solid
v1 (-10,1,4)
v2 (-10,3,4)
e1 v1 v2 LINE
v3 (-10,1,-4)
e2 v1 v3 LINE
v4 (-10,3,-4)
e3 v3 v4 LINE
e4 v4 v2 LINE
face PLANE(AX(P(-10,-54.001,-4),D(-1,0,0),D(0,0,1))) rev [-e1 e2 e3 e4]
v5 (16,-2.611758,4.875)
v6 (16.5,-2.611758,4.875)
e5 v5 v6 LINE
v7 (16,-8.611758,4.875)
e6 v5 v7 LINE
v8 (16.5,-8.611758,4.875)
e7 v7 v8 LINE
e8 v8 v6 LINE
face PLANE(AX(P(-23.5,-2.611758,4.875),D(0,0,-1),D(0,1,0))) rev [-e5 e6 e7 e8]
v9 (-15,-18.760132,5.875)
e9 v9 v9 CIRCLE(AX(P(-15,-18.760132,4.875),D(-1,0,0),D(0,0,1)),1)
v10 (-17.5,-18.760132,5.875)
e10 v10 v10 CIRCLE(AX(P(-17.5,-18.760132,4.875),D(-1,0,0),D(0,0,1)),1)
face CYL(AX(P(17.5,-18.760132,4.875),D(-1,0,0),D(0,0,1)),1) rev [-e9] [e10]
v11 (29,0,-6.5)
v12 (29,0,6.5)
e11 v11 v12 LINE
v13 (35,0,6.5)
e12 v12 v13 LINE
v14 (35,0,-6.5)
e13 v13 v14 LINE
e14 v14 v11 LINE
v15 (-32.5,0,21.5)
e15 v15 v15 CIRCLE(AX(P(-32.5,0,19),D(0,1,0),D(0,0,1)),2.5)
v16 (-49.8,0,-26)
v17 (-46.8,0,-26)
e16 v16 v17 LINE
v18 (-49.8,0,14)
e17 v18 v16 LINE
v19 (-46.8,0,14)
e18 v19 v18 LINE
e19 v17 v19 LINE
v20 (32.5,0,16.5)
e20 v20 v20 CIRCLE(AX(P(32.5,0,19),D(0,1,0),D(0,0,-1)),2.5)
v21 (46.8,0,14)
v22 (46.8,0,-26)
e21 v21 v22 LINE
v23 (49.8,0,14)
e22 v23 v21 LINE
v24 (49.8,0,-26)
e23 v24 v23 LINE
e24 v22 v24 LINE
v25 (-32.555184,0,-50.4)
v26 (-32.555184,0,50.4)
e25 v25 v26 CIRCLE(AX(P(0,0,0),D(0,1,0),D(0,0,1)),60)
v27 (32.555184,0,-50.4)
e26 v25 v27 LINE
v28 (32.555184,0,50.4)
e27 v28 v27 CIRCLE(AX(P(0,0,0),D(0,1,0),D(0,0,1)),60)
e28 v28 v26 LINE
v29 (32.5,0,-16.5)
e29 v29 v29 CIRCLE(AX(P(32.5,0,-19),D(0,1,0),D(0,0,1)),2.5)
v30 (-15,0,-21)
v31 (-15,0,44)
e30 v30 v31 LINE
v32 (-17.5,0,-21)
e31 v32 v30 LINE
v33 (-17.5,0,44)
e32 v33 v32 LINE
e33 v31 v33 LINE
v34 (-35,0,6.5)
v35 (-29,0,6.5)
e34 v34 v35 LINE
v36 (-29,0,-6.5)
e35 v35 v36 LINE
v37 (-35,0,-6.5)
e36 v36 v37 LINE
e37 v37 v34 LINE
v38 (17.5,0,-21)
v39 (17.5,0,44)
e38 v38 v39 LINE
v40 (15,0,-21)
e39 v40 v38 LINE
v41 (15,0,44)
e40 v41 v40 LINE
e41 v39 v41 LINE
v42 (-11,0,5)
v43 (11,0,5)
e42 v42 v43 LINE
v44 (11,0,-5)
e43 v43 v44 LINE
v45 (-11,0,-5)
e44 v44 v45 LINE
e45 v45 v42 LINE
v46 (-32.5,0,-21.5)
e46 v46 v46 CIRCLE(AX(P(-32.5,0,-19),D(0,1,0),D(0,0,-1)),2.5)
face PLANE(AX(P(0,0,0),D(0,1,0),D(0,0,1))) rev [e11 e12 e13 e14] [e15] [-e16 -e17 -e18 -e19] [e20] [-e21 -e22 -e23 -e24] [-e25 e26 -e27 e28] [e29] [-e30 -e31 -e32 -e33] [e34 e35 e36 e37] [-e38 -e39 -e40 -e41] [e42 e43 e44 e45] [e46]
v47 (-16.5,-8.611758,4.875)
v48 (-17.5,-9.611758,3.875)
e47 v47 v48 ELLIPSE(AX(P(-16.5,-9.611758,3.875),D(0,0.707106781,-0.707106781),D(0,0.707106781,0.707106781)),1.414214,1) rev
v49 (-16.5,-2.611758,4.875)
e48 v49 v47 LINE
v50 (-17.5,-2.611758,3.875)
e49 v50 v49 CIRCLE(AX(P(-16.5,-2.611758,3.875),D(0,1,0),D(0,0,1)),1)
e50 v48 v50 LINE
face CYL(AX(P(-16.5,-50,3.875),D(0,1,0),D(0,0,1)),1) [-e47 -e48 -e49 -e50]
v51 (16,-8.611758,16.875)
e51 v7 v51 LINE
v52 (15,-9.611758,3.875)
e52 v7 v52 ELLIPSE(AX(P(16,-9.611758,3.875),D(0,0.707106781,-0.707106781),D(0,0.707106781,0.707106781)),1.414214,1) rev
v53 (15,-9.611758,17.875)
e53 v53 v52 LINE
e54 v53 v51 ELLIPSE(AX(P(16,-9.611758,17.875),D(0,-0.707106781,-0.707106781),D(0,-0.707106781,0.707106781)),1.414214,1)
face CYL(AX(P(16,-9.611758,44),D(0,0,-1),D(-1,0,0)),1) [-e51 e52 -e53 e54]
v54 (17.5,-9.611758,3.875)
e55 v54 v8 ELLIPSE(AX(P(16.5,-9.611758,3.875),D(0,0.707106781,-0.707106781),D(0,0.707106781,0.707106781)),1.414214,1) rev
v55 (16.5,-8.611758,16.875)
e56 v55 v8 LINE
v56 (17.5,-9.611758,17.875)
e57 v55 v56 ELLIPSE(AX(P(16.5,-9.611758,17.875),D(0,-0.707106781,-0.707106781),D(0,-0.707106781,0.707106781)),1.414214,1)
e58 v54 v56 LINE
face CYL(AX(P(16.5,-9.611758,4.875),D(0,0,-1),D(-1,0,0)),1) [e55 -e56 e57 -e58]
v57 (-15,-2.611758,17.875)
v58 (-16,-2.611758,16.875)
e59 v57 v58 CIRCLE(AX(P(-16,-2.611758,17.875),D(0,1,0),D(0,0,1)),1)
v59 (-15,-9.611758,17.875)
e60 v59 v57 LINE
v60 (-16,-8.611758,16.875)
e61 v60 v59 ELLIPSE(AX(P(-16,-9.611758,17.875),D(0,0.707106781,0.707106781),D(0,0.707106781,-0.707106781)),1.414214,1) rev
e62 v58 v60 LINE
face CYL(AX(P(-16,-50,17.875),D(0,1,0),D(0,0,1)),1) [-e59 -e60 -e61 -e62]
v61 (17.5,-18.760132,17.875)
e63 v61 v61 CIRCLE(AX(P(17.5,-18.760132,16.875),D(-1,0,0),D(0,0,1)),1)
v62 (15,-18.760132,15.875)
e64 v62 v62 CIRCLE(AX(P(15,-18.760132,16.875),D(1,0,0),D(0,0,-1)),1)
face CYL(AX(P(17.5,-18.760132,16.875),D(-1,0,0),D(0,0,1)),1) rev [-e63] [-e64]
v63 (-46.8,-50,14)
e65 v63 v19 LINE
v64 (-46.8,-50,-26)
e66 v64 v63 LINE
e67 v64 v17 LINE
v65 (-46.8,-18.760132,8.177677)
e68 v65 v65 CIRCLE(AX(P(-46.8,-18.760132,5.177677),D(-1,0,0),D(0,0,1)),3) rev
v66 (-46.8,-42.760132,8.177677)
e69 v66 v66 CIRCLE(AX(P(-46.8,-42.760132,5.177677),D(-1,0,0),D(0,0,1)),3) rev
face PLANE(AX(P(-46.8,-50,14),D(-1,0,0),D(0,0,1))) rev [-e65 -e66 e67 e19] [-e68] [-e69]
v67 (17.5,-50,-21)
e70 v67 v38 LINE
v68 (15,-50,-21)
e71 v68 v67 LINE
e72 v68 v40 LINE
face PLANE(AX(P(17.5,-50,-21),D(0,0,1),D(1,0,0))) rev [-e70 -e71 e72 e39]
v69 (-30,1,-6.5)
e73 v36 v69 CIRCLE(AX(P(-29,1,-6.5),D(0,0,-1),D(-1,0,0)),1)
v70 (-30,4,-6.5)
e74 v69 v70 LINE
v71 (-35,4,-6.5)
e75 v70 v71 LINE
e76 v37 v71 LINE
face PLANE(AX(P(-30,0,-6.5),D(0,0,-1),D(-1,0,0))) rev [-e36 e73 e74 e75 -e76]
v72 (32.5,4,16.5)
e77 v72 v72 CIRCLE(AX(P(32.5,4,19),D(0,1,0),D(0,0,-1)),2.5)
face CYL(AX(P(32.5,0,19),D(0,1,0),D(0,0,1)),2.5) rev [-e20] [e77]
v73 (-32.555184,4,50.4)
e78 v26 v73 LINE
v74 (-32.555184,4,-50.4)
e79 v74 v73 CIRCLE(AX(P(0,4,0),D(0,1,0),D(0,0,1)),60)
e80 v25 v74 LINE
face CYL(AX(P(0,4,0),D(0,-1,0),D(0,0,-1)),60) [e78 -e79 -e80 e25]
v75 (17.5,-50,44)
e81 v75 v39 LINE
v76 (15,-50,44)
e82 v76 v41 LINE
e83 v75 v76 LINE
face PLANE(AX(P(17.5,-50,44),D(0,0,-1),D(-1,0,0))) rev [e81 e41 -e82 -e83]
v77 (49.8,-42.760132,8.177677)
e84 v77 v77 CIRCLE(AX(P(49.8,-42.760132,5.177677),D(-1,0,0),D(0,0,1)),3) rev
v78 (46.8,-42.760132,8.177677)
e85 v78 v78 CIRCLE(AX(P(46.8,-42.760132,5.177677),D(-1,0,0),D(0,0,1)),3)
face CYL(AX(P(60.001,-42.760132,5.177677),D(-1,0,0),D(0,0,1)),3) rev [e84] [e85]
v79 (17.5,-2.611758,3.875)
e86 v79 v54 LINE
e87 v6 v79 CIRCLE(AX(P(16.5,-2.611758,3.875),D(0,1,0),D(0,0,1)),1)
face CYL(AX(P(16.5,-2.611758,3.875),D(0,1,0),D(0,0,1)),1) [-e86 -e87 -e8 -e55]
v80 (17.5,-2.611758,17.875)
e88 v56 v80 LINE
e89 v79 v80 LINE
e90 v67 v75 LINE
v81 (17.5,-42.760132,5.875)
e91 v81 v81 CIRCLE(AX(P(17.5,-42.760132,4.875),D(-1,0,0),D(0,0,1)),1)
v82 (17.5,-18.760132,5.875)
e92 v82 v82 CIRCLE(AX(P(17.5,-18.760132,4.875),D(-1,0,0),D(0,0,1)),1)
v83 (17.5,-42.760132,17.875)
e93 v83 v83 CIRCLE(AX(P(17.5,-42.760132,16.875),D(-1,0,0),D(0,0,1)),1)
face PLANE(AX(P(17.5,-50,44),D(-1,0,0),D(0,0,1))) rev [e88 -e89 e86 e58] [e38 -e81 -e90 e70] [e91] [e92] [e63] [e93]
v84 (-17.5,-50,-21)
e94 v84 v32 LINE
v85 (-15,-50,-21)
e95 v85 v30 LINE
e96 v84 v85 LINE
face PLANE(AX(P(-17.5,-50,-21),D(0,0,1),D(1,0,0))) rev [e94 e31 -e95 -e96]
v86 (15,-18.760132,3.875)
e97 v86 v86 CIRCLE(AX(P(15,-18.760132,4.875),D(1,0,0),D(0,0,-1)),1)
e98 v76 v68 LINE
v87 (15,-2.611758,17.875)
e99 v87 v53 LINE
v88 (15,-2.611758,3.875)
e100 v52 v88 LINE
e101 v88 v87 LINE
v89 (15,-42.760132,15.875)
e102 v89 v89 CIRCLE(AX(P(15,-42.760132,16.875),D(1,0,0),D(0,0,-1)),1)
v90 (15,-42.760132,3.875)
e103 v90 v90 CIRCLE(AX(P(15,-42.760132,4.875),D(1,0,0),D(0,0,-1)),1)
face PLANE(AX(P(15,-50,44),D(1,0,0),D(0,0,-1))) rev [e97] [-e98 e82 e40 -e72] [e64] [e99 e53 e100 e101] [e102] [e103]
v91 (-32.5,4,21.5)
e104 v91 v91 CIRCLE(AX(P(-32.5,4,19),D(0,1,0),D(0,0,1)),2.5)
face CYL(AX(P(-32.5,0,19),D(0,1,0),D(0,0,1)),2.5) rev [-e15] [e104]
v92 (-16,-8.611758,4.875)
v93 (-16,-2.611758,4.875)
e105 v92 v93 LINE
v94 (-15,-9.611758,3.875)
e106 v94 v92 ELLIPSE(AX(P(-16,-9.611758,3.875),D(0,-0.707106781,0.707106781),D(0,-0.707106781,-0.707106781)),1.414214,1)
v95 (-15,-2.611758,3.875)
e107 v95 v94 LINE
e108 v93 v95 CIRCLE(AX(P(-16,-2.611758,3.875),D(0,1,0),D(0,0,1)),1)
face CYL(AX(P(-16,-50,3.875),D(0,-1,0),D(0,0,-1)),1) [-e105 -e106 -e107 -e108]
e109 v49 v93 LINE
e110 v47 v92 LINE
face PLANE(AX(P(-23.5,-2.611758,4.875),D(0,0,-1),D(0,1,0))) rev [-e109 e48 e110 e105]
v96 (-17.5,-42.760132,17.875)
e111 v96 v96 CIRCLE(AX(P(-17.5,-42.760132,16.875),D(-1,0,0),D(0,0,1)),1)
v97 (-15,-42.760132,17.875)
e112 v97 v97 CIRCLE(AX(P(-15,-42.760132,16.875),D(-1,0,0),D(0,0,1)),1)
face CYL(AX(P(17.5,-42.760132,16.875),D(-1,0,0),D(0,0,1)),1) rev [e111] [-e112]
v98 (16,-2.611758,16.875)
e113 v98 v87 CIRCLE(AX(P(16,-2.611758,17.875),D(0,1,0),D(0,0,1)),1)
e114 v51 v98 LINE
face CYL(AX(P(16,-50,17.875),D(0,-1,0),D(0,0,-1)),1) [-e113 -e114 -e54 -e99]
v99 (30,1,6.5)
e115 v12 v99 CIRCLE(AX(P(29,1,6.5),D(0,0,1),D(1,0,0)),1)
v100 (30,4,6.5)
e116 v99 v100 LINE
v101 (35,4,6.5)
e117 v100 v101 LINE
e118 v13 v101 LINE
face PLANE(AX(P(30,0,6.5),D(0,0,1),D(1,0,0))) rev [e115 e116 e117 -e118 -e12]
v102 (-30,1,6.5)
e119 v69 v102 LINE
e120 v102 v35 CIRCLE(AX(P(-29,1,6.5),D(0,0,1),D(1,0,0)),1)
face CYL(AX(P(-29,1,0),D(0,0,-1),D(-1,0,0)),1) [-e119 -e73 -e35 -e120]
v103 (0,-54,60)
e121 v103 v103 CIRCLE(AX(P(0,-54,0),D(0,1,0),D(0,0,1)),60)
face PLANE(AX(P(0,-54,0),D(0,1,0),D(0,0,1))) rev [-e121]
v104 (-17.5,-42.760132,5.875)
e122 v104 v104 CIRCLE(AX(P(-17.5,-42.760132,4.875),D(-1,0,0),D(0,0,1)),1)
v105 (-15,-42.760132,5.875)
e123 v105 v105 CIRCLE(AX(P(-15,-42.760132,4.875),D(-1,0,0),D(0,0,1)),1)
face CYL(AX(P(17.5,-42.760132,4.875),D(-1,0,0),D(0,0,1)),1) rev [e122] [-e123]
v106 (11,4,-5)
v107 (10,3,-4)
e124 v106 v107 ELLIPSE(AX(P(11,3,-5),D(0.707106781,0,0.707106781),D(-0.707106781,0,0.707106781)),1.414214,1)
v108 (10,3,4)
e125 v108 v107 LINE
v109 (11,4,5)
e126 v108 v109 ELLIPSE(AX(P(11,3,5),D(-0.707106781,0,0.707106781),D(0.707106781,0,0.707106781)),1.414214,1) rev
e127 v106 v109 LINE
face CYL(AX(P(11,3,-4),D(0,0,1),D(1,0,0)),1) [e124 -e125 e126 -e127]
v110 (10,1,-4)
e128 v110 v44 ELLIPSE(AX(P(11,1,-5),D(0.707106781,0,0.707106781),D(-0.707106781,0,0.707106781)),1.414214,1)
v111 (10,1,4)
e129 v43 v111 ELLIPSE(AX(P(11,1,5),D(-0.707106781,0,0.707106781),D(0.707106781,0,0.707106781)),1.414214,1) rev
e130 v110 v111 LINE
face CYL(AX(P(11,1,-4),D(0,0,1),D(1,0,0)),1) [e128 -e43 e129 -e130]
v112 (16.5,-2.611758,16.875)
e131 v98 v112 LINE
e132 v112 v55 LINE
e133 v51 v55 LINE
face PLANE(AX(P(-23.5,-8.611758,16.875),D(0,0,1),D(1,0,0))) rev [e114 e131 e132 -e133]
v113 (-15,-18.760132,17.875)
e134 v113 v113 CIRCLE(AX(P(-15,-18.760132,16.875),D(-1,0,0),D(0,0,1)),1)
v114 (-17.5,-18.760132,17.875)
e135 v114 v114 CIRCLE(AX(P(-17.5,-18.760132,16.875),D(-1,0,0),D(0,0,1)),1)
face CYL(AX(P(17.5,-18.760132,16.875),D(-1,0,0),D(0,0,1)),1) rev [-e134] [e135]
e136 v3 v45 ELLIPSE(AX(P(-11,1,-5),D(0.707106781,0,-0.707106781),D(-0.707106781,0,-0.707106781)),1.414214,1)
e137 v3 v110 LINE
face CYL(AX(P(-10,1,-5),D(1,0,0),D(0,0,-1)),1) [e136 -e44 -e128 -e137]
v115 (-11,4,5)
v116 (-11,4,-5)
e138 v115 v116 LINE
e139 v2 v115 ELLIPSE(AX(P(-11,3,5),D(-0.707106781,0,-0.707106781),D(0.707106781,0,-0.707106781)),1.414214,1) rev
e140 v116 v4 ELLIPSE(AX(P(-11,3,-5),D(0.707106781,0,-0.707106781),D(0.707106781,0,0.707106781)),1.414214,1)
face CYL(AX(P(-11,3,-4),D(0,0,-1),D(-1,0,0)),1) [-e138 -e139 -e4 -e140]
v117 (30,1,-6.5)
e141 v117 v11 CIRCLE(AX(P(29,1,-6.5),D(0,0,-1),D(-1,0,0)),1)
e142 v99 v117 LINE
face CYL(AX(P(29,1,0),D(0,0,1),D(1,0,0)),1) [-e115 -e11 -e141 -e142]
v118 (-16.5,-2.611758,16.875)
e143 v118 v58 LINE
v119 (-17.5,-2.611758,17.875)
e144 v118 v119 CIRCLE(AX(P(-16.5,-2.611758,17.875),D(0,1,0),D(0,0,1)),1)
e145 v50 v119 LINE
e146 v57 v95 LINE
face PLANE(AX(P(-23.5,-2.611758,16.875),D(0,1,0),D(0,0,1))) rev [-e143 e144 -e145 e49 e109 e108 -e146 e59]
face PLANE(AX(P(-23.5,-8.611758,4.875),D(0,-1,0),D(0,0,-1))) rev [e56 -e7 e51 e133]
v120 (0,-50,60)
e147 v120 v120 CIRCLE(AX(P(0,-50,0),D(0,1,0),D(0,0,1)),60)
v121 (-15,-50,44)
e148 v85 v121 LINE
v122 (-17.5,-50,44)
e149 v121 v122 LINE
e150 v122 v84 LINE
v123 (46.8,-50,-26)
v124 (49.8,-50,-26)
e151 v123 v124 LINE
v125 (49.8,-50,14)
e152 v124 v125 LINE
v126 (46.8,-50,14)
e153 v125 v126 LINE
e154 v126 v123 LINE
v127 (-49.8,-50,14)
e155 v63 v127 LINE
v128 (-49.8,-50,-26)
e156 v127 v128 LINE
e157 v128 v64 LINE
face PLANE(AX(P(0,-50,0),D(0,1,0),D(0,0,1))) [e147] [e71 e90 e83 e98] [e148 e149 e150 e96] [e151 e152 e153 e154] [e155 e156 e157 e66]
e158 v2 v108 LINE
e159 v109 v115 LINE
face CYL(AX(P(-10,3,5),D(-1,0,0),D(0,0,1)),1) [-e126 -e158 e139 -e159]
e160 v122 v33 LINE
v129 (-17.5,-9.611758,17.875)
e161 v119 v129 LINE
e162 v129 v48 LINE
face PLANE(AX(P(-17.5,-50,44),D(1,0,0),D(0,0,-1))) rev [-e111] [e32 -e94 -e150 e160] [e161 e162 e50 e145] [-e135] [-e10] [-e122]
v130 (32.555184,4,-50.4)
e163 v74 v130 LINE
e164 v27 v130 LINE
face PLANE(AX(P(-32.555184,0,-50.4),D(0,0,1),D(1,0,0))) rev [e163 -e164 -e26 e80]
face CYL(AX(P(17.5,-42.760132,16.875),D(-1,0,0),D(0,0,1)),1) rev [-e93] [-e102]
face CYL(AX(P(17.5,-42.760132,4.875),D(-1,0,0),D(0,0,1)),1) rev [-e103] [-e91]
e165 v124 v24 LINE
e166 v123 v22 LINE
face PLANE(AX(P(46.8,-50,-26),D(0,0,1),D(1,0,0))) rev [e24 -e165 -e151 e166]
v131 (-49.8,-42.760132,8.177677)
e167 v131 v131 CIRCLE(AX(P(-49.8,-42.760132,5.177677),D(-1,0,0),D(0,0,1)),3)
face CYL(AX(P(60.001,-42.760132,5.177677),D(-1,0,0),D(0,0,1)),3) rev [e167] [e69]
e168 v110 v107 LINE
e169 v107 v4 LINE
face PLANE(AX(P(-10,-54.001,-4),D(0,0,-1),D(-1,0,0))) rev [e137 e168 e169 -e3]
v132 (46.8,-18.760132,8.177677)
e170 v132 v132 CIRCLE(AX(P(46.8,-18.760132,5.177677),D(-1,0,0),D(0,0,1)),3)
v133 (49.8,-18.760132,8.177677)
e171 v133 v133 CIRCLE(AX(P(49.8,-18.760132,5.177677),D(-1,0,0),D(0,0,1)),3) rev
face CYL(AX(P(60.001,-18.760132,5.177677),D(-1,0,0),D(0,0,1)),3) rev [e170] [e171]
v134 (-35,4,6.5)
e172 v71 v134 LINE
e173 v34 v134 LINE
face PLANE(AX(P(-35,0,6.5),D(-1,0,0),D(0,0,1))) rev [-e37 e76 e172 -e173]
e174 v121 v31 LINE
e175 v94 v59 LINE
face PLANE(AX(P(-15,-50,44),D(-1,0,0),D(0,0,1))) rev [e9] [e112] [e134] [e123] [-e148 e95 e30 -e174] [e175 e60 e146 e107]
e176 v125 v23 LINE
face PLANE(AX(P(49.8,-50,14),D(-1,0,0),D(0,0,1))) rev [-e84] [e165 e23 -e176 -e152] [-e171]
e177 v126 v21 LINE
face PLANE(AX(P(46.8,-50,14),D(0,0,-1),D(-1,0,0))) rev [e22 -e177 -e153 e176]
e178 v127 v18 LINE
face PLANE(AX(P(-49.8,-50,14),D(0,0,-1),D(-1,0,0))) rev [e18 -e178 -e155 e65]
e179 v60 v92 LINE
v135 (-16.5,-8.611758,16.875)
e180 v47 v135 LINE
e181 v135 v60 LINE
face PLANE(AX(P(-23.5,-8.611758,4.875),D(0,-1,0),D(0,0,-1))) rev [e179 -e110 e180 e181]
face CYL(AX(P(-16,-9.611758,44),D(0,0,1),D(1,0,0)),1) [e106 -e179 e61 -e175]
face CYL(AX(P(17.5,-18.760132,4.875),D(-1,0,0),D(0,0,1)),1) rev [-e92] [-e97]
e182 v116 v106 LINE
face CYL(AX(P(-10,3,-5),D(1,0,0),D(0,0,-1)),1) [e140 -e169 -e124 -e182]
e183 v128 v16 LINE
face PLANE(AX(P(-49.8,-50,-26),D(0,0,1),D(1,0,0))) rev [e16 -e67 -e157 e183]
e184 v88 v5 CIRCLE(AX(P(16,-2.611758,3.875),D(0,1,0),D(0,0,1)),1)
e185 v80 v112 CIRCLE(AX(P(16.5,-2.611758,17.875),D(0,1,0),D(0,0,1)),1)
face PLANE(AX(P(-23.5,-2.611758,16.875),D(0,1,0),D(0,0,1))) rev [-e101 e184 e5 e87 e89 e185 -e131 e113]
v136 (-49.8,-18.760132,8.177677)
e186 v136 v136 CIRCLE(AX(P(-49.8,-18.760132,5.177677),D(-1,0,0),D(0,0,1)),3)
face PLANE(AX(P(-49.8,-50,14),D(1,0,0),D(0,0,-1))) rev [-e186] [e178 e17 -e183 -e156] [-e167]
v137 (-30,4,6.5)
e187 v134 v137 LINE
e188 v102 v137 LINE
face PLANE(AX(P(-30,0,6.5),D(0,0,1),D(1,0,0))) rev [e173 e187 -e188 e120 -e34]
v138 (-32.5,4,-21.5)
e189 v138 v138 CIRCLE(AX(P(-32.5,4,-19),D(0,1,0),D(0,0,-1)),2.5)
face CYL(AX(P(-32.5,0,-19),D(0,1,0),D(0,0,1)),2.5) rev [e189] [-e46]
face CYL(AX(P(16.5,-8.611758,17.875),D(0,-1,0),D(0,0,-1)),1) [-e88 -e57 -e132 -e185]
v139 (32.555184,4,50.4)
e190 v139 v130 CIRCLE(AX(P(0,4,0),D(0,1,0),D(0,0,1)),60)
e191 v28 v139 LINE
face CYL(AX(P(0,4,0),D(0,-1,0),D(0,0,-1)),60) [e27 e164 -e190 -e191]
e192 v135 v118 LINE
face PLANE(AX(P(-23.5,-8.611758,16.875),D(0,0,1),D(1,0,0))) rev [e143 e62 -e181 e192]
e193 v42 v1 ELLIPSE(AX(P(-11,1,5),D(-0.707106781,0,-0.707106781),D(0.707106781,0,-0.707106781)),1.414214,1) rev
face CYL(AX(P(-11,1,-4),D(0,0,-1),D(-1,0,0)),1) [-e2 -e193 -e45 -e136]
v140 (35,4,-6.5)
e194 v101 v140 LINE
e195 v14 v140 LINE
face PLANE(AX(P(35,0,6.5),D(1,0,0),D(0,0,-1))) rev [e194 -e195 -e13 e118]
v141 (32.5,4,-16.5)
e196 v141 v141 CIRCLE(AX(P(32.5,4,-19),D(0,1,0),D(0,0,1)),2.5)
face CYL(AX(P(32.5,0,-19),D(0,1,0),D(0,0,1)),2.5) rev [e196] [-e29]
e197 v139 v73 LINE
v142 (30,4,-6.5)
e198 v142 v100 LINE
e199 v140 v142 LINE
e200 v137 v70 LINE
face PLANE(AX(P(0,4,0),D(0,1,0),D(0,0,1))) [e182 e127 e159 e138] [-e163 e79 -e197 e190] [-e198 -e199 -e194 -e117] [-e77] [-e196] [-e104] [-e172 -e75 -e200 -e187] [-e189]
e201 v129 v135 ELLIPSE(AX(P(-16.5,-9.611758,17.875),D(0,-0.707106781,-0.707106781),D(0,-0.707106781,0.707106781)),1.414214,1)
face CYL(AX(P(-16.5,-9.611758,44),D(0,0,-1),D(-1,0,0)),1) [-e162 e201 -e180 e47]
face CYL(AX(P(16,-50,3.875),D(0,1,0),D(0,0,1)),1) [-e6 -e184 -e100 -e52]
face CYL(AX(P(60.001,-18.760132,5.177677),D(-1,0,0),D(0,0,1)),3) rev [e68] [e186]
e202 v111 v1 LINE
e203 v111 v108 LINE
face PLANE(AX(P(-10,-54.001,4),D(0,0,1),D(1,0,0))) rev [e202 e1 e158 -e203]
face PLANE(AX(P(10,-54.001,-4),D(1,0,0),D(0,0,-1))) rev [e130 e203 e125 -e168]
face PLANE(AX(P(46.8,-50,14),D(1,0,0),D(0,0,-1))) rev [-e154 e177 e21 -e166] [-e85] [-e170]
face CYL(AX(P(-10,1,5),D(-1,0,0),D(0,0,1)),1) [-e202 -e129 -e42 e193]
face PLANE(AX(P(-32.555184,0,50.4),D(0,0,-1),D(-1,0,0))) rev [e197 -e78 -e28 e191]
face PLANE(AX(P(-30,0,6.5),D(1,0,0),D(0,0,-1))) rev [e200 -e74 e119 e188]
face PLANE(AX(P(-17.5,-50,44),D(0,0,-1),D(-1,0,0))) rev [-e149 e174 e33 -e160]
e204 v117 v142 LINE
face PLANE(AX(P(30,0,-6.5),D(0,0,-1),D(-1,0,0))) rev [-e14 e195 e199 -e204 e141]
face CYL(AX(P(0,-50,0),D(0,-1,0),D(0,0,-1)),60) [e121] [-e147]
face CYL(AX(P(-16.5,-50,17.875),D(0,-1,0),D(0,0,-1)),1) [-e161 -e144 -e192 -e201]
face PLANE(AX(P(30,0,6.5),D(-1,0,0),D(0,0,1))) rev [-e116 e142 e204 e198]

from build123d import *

# Parameters (mm, degrees)
SKETCH1_R                         = 60
BASE_BASE_DEPTH                   = 4
SIDE_START                        = -4
SIDE_CUTS_DEPTH                   = 4
SKETCH3_W                         = 5
SKETCH3_H                         = 13
TENDON_PASS_THROUGH_OPENING_DEPTH = 4
SKETCH4_R                         = 2.5
BASE_MOUNTING_HOLES_DEPTH         = 79.461200603
SKETCH5_W                         = 3
SKETCH5_H                         = 40
SKETCH5_W_2                       = 2.5
SKETCH5_H_2                       = 65
BOSS_EXTRUDE1_DEPTH               = 50
LPATTERN1_COUNT                   = 2
LPATTERN1_PITCH                   = 54
CUT_EXTRUDE1_REACH                = 138.279
SKETCH7_R                         = 3
CUT_EXTRUDE2_START                = -35
SKETCH9_R                         = 1
CUT_EXTRUDE2_DEPTH                = 35
LPATTERN2_COUNT                   = 2
LPATTERN2_PITCH                   = 96.6
FILLET1_R                         = 1
FILLET2_R                         = 1
SKETCH11_W                        = 12
SKETCH11_H                        = 6
CUT_EXTRUDE3_DEPTH                = 41
FILLET3_R                         = 1
FILLET4_R                         = 1
CUT_EXTRUDE4_REACH                = 104.781
SKETCH12_W                        = 20
SKETCH12_H                        = 8
FILLET5_R                         = 1


with BuildPart() as part:
    # Sketch1 → Base Base (new body)
    with BuildSketch(Plane(origin=(0, 0, 0), x_dir=(1, 0, 0), z_dir=(0, 1, 0))):
        with Locations(Location((0, 0, 0), (0, 0, 270))):
            Circle(SKETCH1_R)
    base_base = extrude(amount=BASE_BASE_DEPTH)

    # Sketch2 → Side Cuts (cut)
    with BuildSketch(Plane(origin=(0, 4, 0), x_dir=(1, 0, 0), z_dir=(0, 1, 0)).offset(SIDE_START)):
        with BuildLine():
            Line((-32.555183919, 50.4), (32.555183919, 50.4))
            ThreePointArc((32.555183919, 50.4), (0, 60), (-32.555183919, 50.4))
        make_face()
        with BuildLine():
            Line((-32.555183919, -50.4), (32.555183919, -50.4))
            ThreePointArc((32.555183919, -50.4), (0, -60), (-32.555183919, -50.4))
        make_face()
    extrude(amount=SIDE_CUTS_DEPTH, mode=Mode.SUBTRACT)

    # Sketch3 → Tendon Pass Through Opening (cut)
    with BuildSketch(Plane(origin=(0, 4, 0), x_dir=(1, 0, 0), z_dir=(0, 1, 0))):
        with Locations((32.5, 0)):
            Rectangle(SKETCH3_W, SKETCH3_H)
        with Locations((-32.5, 0)):
            Rectangle(SKETCH3_W, SKETCH3_H)
    extrude(amount=-TENDON_PASS_THROUGH_OPENING_DEPTH, mode=Mode.SUBTRACT)

    # Sketch4 → Base Mounting Holes (cut, through all)
    with BuildSketch(Plane(origin=(0, 4, 0), x_dir=(1, 0, 0), z_dir=(0, 1, 0))):
        with Locations(Location((32.5, 19, 0), (0, 0, 270))):
            Circle(SKETCH4_R)
        with Locations(Location((32.5, -19, 0), (0, 0, 90))):
            Circle(SKETCH4_R)
        with Locations(Location((-32.5, -19, 0), (0, 0, 270))):
            Circle(SKETCH4_R)
        with Locations(Location((-32.5, 19, 0), (0, 0, 90))):
            Circle(SKETCH4_R)
    extrude(amount=-BASE_MOUNTING_HOLES_DEPTH, mode=Mode.SUBTRACT)

    # Sketch5 → Boss-Extrude1 (add)
    with BuildSketch(Plane.XZ):
        with Locations((-48.3, -6)):
            Rectangle(SKETCH5_W, SKETCH5_H)
        with Locations((16.25, 11.5)):
            Rectangle(SKETCH5_W_2, SKETCH5_H_2)
        with Locations((48.3, -6)):
            Rectangle(SKETCH5_W, SKETCH5_H)
        with Locations((-16.25, 11.5)):
            Rectangle(SKETCH5_W_2, SKETCH5_H_2)
    extrude(amount=BOSS_EXTRUDE1_DEPTH)

    # LPattern1: Base Base ×2
    with Locations(*[(0, -i * LPATTERN1_PITCH, 0) for i in range(1, LPATTERN1_COUNT)]):
        add(base_base)

    # Sketch7 → Cut-Extrude1 (cut, up to next)
    with BuildSketch(Plane.ZY.offset(49.8), mode=Mode.PRIVATE) as cut_extrude1_sk1:
        with Locations((5.177676652, -18.760132428)):
            Circle(SKETCH7_R)
    cut_extrude1_tool1 = extrude(cut_extrude1_sk1.sketch, amount=-CUT_EXTRUDE1_REACH, mode=Mode.PRIVATE) & part.part
    # Sketch7 → Cut-Extrude1 (cut, up to next)
    with BuildSketch(Plane.ZY.offset(49.8), mode=Mode.PRIVATE) as cut_extrude1_sk2:
        with Locations((5.177676652, -42.760132428)):
            Circle(SKETCH7_R)
    cut_extrude1_tool2 = extrude(cut_extrude1_sk2.sketch, amount=-CUT_EXTRUDE1_REACH, mode=Mode.PRIVATE) & part.part
    cut_extrude1_1 = cut_extrude1_tool1.solids().sort_by_distance((-49.8, -18.760132, 5.177677))[0]
    add(cut_extrude1_1, mode=Mode.SUBTRACT)
    cut_extrude1_2 = cut_extrude1_tool2.solids().sort_by_distance((-49.8, -42.760132, 5.177677))[0]
    add(cut_extrude1_2, mode=Mode.SUBTRACT)
    cut_extrude1 = cut_extrude1_1 + cut_extrude1_2  # Cut-Extrude1 as one shape, for the pattern or mirror that repeats it

    # Sketch9 → Cut-Extrude2 (cut)
    with BuildSketch(Plane.ZY.offset(17.5).offset(CUT_EXTRUDE2_START)):
        with Locations((4.875, -18.760132428)):
            Circle(SKETCH9_R)
        with Locations((4.875, -42.760132428)):
            Circle(SKETCH9_R)
        with Locations((16.875, -18.760132428)):
            Circle(SKETCH9_R)
        with Locations((16.875, -42.760132428)):
            Circle(SKETCH9_R)
    extrude(amount=CUT_EXTRUDE2_DEPTH, mode=Mode.SUBTRACT)

    # LPattern2: Cut-Extrude1 ×2
    with Locations(*[(i * LPATTERN2_PITCH, 0, 0) for i in range(1, LPATTERN2_COUNT)]):
        add(cut_extrude1, mode=Mode.SUBTRACT)

    # Fillet1
    fillet1_edges = [part.edges().sort_by_distance(p)[0] for p in [
        (-30, 0, 0),
    ]]
    fillet(fillet1_edges, radius=FILLET1_R)

    # Fillet2
    fillet2_edges = [part.edges().sort_by_distance(p)[0] for p in [
        (30, 0, 0),
    ]]
    fillet(fillet2_edges, radius=FILLET2_R)

    # Sketch11 → Cut-Extrude3 (cut)
    with BuildSketch(Plane(origin=(17.5, 0, 0), x_dir=(0, 0, -1), z_dir=(1, 0, 0))):
        with Locations((-10.875, -5.611758363)):
            Rectangle(SKETCH11_W, SKETCH11_H)
    extrude(amount=-CUT_EXTRUDE3_DEPTH, mode=Mode.SUBTRACT)

    # Fillet3
    fillet3_edges = [part.edges().sort_by_distance(p)[0] for p in [
        (-17.5, -8.611758363, 10.875),
        (15, -8.611758363, 10.875),
        (-15, -8.611758363, 10.875),
        (17.5, -8.611758363, 10.875),
    ]]
    fillet(fillet3_edges, radius=FILLET3_R)

    # Fillet4
    fillet4_edges = [part.edges().sort_by_distance(p)[0] for p in [
        (-17.5, -6.111758363, 16.875),
        (15, -6.111758363, 16.875),
        (-15, -6.111758363, 16.875),
        (17.5, -6.111758363, 16.875),
        (-15, -6.111758363, 4.875),
        (-17.5, -6.111758363, 4.875),
        (17.5, -6.111758363, 4.875),
        (15, -6.111758363, 4.875),
    ]]
    fillet(fillet4_edges, radius=FILLET4_R - 0.0001)  # a hair under: the kernel refuses the full size

    # Sketch12 → Cut-Extrude4 (cut, up to next)
    with BuildSketch(Plane(origin=(0, 4, 0), x_dir=(1, 0, 0), z_dir=(0, 1, 0)), mode=Mode.PRIVATE) as cut_extrude4_sk1:
        Rectangle(SKETCH12_W, SKETCH12_H)
    cut_extrude4_tool1 = extrude(cut_extrude4_sk1.sketch, amount=-CUT_EXTRUDE4_REACH, mode=Mode.PRIVATE) & part.part
    add(cut_extrude4_tool1.solids().sort_by_distance((0, 4, 0))[0], mode=Mode.SUBTRACT)

    # Fillet5
    fillet5_edges = [part.edges().sort_by_distance(p)[0] for p in [
        (-10, 4, 0),
        (0, 4, 4),
        (10, 4, 0),
        (0, 4, -4),
        (0, 0, 4),
        (-10, 0, 0),
        (0, 0, -4),
        (10, 0, 0),
    ]]
    fillet(fillet5_edges, radius=FILLET5_R)


solid = part.part
